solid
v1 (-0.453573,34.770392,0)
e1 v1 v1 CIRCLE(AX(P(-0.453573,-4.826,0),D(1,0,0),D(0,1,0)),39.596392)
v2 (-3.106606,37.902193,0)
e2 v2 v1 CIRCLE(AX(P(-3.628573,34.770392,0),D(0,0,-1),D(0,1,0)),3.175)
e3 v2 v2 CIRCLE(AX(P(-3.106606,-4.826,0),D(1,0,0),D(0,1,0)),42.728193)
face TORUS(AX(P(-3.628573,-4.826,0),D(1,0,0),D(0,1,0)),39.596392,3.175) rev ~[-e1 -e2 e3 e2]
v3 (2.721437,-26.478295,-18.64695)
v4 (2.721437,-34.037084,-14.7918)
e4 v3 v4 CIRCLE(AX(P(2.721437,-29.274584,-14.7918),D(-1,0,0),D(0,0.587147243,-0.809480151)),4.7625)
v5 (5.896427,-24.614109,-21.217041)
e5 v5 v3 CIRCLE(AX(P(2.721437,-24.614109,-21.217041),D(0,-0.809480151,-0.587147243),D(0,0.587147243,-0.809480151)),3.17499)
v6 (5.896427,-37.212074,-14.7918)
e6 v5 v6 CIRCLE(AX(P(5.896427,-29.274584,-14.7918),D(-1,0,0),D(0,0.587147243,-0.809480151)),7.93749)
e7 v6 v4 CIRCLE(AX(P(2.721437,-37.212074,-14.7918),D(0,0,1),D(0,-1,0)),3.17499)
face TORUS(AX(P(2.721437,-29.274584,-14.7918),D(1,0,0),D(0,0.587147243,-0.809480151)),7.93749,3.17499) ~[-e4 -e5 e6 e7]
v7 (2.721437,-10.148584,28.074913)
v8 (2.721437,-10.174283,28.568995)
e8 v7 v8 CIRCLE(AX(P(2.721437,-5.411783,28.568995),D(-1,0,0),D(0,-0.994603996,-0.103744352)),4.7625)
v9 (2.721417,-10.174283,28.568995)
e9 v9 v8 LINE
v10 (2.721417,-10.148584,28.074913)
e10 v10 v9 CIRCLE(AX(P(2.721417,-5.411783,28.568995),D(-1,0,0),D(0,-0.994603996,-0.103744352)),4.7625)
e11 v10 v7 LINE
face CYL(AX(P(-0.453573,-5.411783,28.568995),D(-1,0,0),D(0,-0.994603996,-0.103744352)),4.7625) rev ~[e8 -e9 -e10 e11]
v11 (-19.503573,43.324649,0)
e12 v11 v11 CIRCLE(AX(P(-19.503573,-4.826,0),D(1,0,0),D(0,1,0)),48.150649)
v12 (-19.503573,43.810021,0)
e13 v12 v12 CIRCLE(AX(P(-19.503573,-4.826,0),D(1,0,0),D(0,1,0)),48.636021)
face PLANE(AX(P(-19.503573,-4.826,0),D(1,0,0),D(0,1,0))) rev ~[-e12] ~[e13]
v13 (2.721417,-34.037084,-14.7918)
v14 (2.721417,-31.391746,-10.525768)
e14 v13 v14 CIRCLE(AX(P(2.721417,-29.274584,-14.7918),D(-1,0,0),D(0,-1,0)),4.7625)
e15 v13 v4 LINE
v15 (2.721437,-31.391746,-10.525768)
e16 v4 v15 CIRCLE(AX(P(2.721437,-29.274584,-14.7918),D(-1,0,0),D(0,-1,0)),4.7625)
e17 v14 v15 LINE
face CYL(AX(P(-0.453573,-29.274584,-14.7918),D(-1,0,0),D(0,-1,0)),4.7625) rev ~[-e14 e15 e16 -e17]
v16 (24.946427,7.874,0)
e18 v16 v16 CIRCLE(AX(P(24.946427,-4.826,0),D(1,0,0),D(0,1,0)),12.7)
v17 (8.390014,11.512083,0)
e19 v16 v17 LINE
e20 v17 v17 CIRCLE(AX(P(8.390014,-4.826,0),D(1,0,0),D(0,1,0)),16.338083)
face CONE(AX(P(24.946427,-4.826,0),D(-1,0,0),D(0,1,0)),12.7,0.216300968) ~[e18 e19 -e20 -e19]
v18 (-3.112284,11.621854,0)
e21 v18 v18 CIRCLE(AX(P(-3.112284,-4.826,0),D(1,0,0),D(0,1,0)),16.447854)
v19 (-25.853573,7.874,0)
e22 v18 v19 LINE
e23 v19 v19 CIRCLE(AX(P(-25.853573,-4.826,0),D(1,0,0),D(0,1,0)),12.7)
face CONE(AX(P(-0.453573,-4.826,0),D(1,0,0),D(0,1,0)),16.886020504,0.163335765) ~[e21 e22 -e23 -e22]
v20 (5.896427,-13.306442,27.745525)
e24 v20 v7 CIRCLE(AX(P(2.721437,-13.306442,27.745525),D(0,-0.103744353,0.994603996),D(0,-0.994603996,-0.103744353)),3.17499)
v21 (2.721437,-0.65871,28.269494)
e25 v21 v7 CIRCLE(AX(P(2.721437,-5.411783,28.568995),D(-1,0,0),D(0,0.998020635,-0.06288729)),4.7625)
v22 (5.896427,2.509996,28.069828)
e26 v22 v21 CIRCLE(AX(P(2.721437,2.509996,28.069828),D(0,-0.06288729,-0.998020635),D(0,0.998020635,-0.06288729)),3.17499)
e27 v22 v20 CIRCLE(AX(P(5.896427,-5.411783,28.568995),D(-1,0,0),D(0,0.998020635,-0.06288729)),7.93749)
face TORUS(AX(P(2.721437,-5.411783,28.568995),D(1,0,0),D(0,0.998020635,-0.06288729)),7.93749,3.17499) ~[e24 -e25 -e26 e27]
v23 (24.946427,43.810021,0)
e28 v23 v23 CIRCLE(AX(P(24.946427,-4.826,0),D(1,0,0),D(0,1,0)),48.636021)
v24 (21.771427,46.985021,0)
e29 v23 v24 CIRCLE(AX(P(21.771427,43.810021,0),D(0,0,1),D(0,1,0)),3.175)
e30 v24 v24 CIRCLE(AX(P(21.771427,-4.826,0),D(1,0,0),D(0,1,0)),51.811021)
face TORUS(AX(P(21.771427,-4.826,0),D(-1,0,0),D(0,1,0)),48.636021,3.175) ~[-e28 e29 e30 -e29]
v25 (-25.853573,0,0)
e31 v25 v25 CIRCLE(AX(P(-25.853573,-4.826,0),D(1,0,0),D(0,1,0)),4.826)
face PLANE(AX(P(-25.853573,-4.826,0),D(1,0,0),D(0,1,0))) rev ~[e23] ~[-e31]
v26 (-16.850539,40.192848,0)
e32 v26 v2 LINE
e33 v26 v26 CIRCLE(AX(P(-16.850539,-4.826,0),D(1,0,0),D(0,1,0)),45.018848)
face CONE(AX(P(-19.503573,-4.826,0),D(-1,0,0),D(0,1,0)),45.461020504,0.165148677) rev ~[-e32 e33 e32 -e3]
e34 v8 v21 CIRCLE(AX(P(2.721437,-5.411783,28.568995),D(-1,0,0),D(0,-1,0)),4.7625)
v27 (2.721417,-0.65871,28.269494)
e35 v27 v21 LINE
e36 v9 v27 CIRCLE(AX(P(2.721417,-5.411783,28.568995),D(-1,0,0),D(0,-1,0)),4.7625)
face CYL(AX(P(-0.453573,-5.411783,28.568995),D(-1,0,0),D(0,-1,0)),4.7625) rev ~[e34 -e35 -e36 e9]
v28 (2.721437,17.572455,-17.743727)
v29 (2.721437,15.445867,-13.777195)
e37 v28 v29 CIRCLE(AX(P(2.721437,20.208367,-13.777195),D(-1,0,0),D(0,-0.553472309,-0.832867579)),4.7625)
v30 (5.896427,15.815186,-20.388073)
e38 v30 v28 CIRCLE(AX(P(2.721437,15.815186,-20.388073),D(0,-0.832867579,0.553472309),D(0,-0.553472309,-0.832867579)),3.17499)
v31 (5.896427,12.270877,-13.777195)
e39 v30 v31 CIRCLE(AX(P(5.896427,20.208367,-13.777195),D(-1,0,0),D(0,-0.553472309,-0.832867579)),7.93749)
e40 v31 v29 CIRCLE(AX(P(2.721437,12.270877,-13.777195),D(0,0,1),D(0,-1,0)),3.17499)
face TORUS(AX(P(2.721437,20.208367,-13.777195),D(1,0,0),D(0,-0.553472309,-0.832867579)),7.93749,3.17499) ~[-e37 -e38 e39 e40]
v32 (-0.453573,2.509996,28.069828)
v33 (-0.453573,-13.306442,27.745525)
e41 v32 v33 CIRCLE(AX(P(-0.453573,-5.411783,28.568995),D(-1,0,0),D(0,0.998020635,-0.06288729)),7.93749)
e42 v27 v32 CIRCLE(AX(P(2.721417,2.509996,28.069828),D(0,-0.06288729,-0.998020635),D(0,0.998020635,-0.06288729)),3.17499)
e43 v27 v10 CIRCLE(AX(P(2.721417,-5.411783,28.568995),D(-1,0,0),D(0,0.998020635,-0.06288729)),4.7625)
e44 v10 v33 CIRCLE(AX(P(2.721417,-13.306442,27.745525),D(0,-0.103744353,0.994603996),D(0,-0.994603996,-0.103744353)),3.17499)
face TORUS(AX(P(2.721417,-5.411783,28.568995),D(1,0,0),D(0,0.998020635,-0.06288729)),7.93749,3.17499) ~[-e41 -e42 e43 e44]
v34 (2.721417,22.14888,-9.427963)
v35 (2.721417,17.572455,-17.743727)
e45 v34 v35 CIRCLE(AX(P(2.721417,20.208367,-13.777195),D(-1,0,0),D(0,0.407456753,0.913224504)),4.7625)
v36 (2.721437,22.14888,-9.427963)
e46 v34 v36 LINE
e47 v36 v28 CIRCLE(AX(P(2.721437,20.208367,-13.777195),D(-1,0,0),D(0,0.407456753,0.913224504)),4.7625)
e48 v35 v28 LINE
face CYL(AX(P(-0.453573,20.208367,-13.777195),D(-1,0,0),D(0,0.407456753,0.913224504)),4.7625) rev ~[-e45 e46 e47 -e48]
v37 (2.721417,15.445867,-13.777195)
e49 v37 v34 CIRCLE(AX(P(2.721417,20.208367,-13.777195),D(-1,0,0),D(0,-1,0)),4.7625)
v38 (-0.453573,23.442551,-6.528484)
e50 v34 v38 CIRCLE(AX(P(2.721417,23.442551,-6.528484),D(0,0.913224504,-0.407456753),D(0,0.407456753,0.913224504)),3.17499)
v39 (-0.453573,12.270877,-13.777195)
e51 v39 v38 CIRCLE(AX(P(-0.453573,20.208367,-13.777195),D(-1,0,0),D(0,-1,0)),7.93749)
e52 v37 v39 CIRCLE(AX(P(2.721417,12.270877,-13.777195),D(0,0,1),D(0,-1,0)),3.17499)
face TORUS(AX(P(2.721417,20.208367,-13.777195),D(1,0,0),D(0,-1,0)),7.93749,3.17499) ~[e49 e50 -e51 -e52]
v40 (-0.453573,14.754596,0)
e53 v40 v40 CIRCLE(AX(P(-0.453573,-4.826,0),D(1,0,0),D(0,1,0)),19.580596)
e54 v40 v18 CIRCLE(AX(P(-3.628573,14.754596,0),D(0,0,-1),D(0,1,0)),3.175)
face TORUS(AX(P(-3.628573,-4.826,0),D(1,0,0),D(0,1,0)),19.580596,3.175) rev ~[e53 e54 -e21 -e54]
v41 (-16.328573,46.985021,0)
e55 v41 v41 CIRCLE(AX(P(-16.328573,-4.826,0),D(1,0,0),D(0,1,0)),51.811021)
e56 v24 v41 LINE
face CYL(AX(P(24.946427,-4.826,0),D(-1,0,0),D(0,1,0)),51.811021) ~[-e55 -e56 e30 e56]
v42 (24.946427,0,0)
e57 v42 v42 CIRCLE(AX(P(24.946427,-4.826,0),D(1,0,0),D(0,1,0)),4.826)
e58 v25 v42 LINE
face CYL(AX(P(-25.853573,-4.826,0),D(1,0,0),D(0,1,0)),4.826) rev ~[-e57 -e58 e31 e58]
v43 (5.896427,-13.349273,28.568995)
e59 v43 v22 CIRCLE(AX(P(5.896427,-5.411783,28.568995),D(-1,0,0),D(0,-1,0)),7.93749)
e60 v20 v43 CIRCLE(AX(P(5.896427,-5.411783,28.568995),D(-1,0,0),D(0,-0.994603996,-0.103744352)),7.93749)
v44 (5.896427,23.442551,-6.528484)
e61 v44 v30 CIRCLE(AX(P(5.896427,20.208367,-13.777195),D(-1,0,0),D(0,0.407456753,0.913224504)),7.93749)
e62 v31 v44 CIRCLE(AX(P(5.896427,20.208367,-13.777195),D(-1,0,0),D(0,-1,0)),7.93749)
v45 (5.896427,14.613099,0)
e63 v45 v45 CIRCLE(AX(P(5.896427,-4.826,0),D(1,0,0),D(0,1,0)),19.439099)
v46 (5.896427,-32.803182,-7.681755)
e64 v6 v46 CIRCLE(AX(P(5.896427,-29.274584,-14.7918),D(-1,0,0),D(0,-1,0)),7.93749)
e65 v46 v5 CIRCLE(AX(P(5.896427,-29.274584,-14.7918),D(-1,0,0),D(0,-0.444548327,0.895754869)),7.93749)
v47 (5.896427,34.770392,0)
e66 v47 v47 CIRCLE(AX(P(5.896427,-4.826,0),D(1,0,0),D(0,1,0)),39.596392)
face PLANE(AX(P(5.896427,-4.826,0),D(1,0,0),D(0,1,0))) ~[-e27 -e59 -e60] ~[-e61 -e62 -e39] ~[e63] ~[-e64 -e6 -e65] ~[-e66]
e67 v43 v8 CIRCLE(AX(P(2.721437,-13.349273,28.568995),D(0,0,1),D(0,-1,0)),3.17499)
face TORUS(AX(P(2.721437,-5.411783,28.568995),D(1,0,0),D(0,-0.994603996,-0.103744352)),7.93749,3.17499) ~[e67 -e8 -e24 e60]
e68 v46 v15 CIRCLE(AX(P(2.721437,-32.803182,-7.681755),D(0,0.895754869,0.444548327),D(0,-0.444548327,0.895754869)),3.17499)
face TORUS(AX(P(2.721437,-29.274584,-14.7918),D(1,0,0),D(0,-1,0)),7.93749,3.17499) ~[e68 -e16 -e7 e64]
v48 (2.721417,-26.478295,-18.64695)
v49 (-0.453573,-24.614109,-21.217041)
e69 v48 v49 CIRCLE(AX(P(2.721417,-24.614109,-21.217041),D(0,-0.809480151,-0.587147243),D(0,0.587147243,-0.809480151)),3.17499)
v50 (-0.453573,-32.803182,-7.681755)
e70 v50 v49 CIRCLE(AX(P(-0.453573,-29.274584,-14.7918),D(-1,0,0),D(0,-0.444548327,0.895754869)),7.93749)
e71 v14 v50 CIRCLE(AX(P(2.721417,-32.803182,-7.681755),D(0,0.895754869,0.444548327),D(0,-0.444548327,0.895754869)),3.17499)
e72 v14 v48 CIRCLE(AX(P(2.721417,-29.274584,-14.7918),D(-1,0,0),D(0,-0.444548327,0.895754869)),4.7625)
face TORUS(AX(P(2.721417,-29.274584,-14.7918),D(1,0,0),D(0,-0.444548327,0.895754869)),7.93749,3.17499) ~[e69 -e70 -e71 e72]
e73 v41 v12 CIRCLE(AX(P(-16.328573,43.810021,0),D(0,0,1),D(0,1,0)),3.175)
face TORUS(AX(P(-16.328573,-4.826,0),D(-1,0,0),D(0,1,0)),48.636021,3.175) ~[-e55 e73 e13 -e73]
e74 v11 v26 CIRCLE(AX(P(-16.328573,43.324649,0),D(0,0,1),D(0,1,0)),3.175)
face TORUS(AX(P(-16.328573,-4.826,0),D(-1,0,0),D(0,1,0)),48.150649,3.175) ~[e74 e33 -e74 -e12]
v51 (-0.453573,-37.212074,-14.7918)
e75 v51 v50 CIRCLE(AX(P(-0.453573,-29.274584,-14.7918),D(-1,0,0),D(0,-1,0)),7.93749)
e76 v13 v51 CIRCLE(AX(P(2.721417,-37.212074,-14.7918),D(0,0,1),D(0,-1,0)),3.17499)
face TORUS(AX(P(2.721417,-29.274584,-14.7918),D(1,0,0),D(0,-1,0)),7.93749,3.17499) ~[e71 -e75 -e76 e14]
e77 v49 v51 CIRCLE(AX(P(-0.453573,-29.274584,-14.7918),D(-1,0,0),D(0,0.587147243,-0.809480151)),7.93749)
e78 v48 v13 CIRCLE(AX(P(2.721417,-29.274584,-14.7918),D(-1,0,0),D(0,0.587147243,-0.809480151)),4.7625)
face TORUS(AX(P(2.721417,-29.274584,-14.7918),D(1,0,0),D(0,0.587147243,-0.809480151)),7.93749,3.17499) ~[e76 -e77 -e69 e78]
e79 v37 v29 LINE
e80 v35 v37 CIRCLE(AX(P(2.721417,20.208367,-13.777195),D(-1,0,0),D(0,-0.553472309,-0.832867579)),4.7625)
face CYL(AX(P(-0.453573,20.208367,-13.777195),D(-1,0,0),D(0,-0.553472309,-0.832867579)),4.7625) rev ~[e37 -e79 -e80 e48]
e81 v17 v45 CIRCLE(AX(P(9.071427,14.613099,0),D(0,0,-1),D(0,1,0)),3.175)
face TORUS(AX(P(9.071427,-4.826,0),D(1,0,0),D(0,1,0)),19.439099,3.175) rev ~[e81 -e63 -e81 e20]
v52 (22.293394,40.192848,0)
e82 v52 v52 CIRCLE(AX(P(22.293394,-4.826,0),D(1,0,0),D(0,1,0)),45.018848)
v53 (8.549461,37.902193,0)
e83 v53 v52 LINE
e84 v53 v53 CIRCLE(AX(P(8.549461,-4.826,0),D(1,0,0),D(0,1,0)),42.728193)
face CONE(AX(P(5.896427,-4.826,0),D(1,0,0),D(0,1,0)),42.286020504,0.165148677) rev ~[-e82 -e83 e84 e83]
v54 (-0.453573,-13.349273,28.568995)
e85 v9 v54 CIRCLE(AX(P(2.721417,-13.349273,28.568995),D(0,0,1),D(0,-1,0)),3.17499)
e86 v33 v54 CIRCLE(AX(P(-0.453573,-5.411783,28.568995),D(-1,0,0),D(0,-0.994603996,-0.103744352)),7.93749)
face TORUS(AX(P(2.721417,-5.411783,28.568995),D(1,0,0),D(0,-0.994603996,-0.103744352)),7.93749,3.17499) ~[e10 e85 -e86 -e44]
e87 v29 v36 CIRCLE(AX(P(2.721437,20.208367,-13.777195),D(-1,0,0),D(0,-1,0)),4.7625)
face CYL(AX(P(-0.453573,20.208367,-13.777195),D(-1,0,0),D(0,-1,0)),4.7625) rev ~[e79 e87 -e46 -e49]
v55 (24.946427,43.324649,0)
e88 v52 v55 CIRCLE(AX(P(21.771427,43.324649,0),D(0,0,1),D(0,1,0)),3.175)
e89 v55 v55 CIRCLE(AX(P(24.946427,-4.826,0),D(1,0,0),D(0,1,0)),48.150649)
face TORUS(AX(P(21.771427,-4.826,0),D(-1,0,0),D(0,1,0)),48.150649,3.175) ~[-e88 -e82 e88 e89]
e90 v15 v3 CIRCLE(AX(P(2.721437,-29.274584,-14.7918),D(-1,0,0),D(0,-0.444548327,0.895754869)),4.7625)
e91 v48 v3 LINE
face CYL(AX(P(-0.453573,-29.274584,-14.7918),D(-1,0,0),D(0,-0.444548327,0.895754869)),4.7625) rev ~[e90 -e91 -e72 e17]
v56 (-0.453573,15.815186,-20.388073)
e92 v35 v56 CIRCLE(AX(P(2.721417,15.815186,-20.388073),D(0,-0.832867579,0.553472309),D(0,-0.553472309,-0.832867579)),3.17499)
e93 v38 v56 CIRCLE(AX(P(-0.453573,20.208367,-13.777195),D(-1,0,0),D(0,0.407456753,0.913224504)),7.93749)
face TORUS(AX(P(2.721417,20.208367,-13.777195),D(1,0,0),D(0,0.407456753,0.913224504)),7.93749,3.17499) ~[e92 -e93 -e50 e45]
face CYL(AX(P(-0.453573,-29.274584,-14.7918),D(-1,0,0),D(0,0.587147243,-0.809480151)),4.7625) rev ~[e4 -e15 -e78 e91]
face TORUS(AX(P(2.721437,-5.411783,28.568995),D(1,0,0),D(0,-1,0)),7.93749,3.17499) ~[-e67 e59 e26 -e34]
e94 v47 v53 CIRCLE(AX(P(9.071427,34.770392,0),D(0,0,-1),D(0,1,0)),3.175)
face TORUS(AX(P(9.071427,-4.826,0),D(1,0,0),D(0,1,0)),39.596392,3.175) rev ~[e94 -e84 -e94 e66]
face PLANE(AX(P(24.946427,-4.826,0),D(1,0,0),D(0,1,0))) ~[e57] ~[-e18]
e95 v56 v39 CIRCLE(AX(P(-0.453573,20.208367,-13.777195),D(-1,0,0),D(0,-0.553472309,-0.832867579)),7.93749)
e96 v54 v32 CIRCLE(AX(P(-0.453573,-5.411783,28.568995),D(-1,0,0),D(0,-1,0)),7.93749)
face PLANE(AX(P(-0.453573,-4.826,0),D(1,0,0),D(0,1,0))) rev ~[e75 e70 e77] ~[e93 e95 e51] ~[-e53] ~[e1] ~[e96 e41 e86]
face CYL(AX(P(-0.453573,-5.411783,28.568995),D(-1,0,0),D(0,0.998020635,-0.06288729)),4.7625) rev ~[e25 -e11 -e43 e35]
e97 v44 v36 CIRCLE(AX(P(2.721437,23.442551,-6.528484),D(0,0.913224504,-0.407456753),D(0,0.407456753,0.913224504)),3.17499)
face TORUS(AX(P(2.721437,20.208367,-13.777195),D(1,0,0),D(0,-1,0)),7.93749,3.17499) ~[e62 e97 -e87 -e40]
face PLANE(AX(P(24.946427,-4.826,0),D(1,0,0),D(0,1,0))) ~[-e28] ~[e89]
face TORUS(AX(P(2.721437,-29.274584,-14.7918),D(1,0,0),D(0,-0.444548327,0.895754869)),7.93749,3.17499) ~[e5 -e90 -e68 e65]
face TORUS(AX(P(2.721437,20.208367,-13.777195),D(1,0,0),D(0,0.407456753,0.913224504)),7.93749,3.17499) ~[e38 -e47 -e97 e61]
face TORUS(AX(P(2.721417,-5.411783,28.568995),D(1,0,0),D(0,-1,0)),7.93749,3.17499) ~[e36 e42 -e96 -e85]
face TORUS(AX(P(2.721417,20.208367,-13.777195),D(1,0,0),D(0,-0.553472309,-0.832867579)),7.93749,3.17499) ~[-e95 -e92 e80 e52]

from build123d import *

# Parameters (mm, degrees)
F2_R     = 3.175
F4_DEPTH = 25.4
F5_R     = 3.17499


# Not quite as in the source:
# - a fillet or chamfer is up to 0.001 mm smaller than in the source, because OpenCascade refuses the exact size


with BuildPart() as f1:
    # F0 (on Top) → F1 (revolve)
    with BuildSketch(Plane.XY):
        Polygon((-25.8535725378, 7.874), (-25.8535725378, 0), (24.9464274622, 0), (24.9464274622, 7.874), (5.8964274622, 12.0600205039), (-0.4535725378, 12.0600205039), align=None)
        Polygon((-0.4535725378, 37.4600205039), (-0.4535725378, 12.0600205039), (5.8964274622, 12.0600205039), (5.8964274622, 37.4600205039), (24.9464274622, 40.6350205039), (24.9464274622, 46.9850205039), (-0.4535725378, 46.9850205039), align=None)
        Polygon((-19.5035725378, 40.6350205039), (-0.4535725378, 37.4600205039), (-0.4535725378, 46.9850205039), (-19.5035725378, 46.9850205039), align=None)
    revolve(axis=Axis((-0.2934029948, -4.826, 0), (1, 0, 0)))

    # F2
    f2_edges = [f1.edges().sort_by_distance(p)[0] for p in [
        (5.896427, -47.112021, 0),
        (24.946427, -50.287021, 0),
        (24.946427, -56.637021, 0),
        (5.896427, -21.712021, 0),
        (-19.503573, -56.637021, 0),
        (-19.503573, -50.287021, 0),
        (-0.453573, -21.712021, 0),
        (-0.453573, -47.112021, 0),
    ]]
    fillet(f2_edges, radius=F2_R)

    # F3 (on face) → F4 (cut)
    with BuildSketch(Plane(origin=(-0.4535725378, 0, 0), x_dir=(0, -1, 0), z_dir=(-1, 0, 0))):
        with BuildLine():
            ThreePointArc((0.658709515, 28.2694944244), (5.314152326, 23.8074959531), (10.1485843232, 28.0749126646))
            ThreePointArc((10.1485843232, 28.0749126646), (5.4117827912, 28.5689951437), (0.658709515, 28.2694944244))
        make_face()
        with BuildLine():
            ThreePointArc((0.658709515, 28.2694944244), (5.4117827912, 28.5689951437), (10.1485843232, 28.0749126646))
            ThreePointArc((10.1485843232, 28.0749126646), (10.1678538349, 28.3216199694), (10.1742827912, 28.5689951437))
            ThreePointArc((10.1742827912, 28.5689951437), (5.2619582739, 33.3291378794), (0.658709515, 28.2694944244))
        make_face()
        with BuildLine():
            ThreePointArc((34.0370841595, -14.7918003501), (33.3220764355, -12.2819771442), (31.3917455662, -10.5257677872))
            ThreePointArc((31.3917455662, -10.5257677872), (29.2745841595, -14.7918003501), (26.4782954149, -18.64694957))
            ThreePointArc((26.4782954149, -18.64694957), (31.4383864961, -19.0343662834), (34.0370841595, -14.7918003501))
        make_face()
        with BuildLine():
            ThreePointArc((26.4782954149, -18.64694957), (29.2745841595, -14.7918003501), (31.3917455662, -10.5257677872))
            ThreePointArc((31.3917455662, -10.5257677872), (25.1998201329, -12.3265002918), (26.4782954149, -18.64694957))
        make_face()
        with BuildLine():
            ThreePointArc((-15.4458669506, -13.7771947936), (-17.6160982435, -9.7820040347), (-22.1488797381, -9.4279630946))
            ThreePointArc((-22.1488797381, -9.4279630946), (-20.2083669506, -13.7771947936), (-17.5724550812, -17.7437266372))
            ThreePointArc((-17.5724550812, -17.7437266372), (-16.0110501572, -16.0275143233), (-15.4458669506, -13.7771947936))
        make_face()
        with BuildLine():
            ThreePointArc((-17.5724550812, -17.7437266372), (-20.2083669506, -13.7771947936), (-22.1488797381, -9.4279630946))
            ThreePointArc((-22.1488797381, -9.4279630946), (-24.3807614424, -16.0733939259), (-17.5724550812, -17.7437266372))
        make_face()
    extrude(amount=-F4_DEPTH, mode=Mode.SUBTRACT)

    # F5 (radius 3.175 in the source; OpenCascade refuses exactly that, so slightly less here)
    f5_edges = [f1.edges().sort_by_distance(p)[0] for p in [
        (-0.453573, 18.267854, -18.126426),
        (5.896427, 18.267854, -18.126426),
        (-0.453573, -27.157423, -19.057833),
        (5.896427, -27.157423, -19.057833),
        (-0.453573, -0.674981, 29.063078),
        (5.896427, -0.674981, 29.063078),
    ]]
    fillet(f5_edges, radius=F5_R)


solid = f1.part
